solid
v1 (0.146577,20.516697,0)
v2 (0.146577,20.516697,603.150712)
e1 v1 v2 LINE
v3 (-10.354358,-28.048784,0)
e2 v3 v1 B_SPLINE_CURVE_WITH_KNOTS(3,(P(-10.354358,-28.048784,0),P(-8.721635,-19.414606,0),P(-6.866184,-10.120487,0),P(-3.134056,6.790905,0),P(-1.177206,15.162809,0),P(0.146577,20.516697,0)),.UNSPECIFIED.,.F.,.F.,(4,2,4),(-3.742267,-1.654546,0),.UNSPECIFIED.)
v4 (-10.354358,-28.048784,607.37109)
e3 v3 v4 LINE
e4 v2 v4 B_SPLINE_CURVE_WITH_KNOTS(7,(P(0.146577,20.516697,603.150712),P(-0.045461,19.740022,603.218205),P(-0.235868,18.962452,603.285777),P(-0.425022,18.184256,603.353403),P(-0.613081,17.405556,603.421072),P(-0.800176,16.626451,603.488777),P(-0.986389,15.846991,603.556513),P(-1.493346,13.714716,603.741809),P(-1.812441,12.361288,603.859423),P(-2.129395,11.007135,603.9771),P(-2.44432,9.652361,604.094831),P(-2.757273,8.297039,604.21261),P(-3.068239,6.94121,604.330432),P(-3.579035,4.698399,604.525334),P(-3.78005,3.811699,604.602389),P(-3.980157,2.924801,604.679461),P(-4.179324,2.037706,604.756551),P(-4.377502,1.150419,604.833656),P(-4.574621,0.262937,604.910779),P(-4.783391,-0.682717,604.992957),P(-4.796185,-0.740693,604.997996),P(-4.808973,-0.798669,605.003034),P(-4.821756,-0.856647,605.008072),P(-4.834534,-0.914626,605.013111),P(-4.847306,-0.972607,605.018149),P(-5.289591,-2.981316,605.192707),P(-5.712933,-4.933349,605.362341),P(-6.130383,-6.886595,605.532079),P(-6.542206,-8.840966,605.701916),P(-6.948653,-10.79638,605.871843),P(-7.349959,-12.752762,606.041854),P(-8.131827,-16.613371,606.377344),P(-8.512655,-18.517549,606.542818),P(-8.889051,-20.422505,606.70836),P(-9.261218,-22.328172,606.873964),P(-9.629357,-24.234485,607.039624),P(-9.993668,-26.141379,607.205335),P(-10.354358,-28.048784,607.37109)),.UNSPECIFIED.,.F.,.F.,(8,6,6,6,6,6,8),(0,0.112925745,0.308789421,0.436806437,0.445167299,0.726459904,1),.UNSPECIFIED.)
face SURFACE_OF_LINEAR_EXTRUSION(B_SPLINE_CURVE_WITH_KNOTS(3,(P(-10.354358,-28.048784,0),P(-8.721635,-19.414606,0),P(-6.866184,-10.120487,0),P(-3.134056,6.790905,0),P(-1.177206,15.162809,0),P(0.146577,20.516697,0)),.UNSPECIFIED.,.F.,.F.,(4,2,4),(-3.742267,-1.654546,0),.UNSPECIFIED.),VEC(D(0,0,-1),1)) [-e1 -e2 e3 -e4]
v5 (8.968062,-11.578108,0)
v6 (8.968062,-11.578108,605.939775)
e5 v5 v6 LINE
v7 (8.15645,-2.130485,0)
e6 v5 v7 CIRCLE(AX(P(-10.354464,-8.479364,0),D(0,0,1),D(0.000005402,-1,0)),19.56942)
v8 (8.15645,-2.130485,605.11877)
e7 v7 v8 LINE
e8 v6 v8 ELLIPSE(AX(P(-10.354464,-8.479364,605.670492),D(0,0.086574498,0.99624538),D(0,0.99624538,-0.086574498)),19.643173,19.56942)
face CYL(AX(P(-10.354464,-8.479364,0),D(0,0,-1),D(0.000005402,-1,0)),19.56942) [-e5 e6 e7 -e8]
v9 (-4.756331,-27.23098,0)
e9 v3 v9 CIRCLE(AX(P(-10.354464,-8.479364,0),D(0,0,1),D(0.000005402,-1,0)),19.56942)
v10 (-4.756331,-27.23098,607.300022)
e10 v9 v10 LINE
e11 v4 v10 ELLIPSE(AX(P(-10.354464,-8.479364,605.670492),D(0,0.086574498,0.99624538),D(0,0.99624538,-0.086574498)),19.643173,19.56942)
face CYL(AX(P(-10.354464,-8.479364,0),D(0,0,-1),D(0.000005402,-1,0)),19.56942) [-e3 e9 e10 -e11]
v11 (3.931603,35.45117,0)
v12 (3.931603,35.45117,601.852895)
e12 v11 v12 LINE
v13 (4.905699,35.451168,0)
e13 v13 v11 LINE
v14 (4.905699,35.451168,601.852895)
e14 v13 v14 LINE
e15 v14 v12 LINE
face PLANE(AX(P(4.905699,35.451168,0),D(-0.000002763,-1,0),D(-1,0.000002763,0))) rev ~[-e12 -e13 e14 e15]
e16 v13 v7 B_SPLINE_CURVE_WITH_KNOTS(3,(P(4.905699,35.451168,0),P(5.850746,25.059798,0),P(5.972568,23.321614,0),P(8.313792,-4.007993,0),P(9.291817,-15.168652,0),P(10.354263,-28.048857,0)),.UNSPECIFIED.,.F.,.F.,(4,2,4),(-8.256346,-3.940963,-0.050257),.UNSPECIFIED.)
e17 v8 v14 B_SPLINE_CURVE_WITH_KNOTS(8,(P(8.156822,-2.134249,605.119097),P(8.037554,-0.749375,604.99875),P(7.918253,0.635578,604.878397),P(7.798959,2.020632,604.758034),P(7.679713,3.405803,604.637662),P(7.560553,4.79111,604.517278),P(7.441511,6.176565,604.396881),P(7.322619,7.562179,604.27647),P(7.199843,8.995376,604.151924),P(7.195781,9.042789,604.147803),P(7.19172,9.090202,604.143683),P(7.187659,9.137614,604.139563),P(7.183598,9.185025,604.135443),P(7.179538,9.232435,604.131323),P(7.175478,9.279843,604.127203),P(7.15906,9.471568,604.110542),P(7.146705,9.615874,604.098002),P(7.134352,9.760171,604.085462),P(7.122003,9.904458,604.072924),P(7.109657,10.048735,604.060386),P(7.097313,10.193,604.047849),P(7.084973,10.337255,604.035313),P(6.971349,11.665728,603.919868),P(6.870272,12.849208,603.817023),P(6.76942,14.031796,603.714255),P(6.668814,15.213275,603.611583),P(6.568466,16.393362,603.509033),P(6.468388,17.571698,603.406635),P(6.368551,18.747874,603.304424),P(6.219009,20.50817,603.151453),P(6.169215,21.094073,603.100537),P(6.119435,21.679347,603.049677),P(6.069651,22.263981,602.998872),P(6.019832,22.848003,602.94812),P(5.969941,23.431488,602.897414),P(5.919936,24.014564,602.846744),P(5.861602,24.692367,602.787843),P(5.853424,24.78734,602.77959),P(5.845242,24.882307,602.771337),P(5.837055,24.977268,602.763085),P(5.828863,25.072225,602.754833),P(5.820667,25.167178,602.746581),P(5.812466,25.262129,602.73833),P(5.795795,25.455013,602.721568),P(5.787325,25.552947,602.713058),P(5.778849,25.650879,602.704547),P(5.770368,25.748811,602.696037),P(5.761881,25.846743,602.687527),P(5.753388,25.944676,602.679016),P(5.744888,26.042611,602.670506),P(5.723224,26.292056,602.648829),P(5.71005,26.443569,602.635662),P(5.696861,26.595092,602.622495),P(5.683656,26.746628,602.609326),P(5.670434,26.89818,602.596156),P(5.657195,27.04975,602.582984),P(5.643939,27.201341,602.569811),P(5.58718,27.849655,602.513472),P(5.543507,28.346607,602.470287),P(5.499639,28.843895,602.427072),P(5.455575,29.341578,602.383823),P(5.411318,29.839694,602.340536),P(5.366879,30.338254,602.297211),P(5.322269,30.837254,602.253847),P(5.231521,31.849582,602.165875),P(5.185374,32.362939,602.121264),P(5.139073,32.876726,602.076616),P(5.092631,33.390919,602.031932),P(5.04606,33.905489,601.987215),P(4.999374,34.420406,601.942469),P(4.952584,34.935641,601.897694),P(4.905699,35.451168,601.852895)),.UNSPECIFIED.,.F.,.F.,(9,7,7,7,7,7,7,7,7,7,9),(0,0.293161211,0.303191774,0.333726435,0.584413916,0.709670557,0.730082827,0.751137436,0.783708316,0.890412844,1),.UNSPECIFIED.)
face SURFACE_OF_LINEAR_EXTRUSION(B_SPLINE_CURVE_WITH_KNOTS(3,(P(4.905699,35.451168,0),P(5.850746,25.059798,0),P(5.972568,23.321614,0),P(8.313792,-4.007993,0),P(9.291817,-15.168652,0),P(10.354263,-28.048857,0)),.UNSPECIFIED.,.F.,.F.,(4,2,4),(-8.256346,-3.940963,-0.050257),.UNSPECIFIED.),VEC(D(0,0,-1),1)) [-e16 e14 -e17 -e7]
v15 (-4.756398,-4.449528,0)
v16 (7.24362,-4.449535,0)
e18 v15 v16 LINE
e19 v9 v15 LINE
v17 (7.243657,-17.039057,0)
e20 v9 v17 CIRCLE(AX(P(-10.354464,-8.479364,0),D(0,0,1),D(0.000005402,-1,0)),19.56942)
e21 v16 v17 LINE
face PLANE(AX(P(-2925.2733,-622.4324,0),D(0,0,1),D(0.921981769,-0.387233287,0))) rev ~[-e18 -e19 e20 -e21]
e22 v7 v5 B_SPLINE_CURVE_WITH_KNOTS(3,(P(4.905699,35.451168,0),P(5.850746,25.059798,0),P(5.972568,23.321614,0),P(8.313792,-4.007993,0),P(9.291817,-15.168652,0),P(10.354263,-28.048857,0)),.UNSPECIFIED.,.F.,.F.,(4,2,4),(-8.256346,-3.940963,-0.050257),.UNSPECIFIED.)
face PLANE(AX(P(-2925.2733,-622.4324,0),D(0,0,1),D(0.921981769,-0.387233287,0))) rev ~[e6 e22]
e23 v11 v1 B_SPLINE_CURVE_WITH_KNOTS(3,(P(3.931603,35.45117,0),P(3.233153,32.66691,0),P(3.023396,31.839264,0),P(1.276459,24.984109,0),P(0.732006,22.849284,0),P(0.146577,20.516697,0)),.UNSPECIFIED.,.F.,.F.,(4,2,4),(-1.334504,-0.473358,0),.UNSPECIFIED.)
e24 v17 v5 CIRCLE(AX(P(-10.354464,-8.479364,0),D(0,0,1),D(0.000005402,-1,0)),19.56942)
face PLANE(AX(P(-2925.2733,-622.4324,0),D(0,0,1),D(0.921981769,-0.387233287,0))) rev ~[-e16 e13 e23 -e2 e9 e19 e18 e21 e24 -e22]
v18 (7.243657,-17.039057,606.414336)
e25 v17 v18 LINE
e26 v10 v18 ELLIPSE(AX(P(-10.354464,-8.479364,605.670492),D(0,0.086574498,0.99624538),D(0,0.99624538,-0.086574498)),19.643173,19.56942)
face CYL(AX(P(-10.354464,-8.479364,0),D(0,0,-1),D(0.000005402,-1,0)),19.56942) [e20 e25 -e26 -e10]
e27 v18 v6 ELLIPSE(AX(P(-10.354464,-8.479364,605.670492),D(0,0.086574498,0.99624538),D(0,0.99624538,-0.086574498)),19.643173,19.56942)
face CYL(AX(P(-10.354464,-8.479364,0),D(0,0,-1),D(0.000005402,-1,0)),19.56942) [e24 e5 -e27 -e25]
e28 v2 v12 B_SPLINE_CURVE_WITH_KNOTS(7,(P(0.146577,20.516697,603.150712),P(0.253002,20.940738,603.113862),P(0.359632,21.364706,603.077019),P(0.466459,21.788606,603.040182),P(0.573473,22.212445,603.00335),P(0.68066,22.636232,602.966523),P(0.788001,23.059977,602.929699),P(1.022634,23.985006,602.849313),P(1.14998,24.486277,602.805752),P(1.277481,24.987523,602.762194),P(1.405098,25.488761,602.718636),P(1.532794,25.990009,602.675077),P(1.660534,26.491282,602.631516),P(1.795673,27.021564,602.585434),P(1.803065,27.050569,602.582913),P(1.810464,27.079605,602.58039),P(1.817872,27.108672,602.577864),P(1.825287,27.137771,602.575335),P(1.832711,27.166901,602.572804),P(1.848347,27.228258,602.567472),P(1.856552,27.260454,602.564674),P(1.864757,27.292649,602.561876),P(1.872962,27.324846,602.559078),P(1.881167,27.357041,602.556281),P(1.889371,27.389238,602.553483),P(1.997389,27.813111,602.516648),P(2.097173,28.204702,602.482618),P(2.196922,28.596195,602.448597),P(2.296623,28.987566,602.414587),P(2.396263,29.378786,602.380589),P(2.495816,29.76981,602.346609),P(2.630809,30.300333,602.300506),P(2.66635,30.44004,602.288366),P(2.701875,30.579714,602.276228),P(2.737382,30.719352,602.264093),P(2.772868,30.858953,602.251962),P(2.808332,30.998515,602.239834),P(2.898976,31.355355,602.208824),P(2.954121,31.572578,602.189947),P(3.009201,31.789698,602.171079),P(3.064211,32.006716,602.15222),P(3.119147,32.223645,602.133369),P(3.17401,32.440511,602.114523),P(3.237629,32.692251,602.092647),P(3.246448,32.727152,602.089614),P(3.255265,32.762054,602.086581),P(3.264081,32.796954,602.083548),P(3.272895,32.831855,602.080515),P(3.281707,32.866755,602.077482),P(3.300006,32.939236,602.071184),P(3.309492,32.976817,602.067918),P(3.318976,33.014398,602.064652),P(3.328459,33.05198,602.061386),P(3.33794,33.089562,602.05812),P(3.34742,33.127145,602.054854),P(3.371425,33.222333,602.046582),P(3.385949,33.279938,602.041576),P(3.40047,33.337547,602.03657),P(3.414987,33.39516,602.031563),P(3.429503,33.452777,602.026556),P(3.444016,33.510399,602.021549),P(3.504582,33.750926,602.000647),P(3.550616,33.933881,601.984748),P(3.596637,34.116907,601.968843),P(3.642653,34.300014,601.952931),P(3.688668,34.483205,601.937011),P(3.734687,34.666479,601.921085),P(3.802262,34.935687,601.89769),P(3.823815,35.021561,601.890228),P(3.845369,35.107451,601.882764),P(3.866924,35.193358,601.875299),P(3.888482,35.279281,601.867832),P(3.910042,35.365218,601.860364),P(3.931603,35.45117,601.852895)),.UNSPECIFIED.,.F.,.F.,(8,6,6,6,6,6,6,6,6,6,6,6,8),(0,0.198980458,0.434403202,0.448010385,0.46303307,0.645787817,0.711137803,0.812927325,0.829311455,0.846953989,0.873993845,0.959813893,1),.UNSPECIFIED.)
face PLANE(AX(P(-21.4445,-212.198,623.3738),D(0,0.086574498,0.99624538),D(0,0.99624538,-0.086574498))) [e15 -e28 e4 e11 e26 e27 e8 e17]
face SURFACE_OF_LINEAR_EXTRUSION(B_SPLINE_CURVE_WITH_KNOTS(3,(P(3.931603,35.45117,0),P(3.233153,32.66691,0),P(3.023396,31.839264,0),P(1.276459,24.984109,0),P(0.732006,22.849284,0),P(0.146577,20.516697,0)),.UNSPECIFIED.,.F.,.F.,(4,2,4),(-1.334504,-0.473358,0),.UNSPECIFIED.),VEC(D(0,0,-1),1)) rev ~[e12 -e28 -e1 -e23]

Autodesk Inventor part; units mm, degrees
ref_plane "YZ Plane" through (0, 0, 0) normal (1, 0, 0) x (0, 1, 0)
ref_plane "XZ Plane" through (0, 0, 0) normal (0, 1, 0) x (-1, 0, 0)
ref_plane "Work Plane1" through (-2925.2733, -622.4324, 0) normal (0, 0, 1) x (0.9219818, -0.3872333, 0)
sketch "Sketch1" plane through (-2925.2733, -622.4324, 0) normal (0, 0, 1) x (0.9219818, -0.3872333, 0)
  line L0 (2457.337, 1676.7645) -> (2462.4983, 1678.9322) projected
  line L1 (2446.8172, 1741.2195) -> (2445.9191, 1740.8423) projected
  spline S0 degree 3 poles (2445.9191, 1740.8423) (2446.3533, 1738.0048) (2446.4804, 1737.1605) (2447.5243, 1730.1637) (2447.849, 1727.9846) (2448.2125, 1725.6073) knots -1.334504 -1.334504 -1.334504 -1.334504 -0.473358 -0.473358 0 0 0 0 projected
  line L2 (2473.5621, 1683.579) -> (2476.43, 1684.7835) projected
  circle A0 centre (1.2437, -14.4504) radius 2 projected
  circle A1 centre (1.2437, -14.4504) radius 1 projected
  circle A2 centre (1.2437, -14.4504) radius 2
  line L3 (2464.4236, 1705.3371) -> (2473.5621, 1683.579) projected
  line L4 (2476.43, 1684.7835) -> (2473.5621, 1683.579) projected
  spline S1 degree 3 poles (2446.8172, 1741.2195) (2451.7124, 1732.0048) (2452.4978, 1730.4494) (2465.2393, 1706.1586) (2470.4628, 1696.2474) (2476.43, 1684.7835) knots -8.256346 -8.256346 -8.256346 -8.256346 -3.940963 -3.940963 -0.050257 -0.050257 -0.050257 -0.050257 projected
  line L5 (2445.9191, 1740.8423) -> (2446.8172, 1741.2195) projected
  spline S2 degree 3 poles (2448.2125, 1725.6073) (2447.849, 1727.9846) (2447.5243, 1730.1637) (2446.4804, 1737.1605) (2446.3533, 1738.0048) (2445.9191, 1740.8423) knots -1.334504 -1.334504 -1.334504 -1.334504 -0.861145 -0.861145 0 0 0 0 projected
  spline S3 degree 3 poles (2457.337, 1676.7645) (2455.4989, 1685.3573) (2453.6106, 1694.6448) (2450.5029, 1711.682) (2449.0652, 1720.1585) (2448.2125, 1725.6073) knots -3.742267 -3.742267 -3.742267 -3.742267 -1.654546 -1.654546 0 0 0 0 projected
  line L6 (2462.4983, 1678.9322) -> (2457.337, 1676.7645) projected
  line L7 (2462.4983, 1678.9322) -> (2453.3598, 1700.6903) projected
  line L8 (2453.3598, 1700.6903) -> (2464.4236, 1705.3371) projected
  circle A3 centre (-81.1133, -14.9806) radius 1
  line L9 (2457.337, 1676.7645) -> (2476.43, 1684.7835)
  arc A4 (2457.337, 1676.7645) -> (2464.3672, 1707.8287) centre (2449.7591, 1694.807) ccw
  line L10 (2453.3598, 1700.6903) -> (2464.4236, 1705.3371) projected
  line L11 (2464.4236, 1705.3371) -> (2473.5621, 1683.579) projected
  line L12 (2462.4983, 1678.9322) -> (2453.3598, 1700.6903) projected
  spline S4 degree 3 poles (2476.43, 1684.7835) (2470.4628, 1696.2474) (2465.2393, 1706.1586) (2452.4978, 1730.4494) (2451.7124, 1732.0048) (2446.8172, 1741.2195) knots -8.256346 -8.256346 -8.256346 -8.256346 -4.36564 -4.36564 -0.050257 -0.050257 -0.050257 -0.050257 projected
  spline S5 degree 3 poles (2448.2125, 1725.6073) (2449.0652, 1720.1585) (2450.5029, 1711.682) (2453.6106, 1694.6448) (2455.4989, 1685.3573) (2457.337, 1676.7645) knots -3.742267 -3.742267 -3.742267 -3.742267 -2.087721 -2.087721 0 0 0 0 projected
  point P0 (2456.022, 1706.6346)
ref_plane "Work Plane2" through (-21.4445, -212.198, 623.3738) normal (0, 0.0865745, 0.9962454) x (1, 0, 0)
extrude "Extrusion1" add sketch "Sketch1" along normal up to surface contours S3 S0 L1 S1 A4 L3 L8 L7 | L7 L8 L3 A4 | S1 A4 surface through (-21.4445, -212.198, 623.3738) normal (0, 0.0865745, 0.9962454)
properties part number "LeftAlerion"
